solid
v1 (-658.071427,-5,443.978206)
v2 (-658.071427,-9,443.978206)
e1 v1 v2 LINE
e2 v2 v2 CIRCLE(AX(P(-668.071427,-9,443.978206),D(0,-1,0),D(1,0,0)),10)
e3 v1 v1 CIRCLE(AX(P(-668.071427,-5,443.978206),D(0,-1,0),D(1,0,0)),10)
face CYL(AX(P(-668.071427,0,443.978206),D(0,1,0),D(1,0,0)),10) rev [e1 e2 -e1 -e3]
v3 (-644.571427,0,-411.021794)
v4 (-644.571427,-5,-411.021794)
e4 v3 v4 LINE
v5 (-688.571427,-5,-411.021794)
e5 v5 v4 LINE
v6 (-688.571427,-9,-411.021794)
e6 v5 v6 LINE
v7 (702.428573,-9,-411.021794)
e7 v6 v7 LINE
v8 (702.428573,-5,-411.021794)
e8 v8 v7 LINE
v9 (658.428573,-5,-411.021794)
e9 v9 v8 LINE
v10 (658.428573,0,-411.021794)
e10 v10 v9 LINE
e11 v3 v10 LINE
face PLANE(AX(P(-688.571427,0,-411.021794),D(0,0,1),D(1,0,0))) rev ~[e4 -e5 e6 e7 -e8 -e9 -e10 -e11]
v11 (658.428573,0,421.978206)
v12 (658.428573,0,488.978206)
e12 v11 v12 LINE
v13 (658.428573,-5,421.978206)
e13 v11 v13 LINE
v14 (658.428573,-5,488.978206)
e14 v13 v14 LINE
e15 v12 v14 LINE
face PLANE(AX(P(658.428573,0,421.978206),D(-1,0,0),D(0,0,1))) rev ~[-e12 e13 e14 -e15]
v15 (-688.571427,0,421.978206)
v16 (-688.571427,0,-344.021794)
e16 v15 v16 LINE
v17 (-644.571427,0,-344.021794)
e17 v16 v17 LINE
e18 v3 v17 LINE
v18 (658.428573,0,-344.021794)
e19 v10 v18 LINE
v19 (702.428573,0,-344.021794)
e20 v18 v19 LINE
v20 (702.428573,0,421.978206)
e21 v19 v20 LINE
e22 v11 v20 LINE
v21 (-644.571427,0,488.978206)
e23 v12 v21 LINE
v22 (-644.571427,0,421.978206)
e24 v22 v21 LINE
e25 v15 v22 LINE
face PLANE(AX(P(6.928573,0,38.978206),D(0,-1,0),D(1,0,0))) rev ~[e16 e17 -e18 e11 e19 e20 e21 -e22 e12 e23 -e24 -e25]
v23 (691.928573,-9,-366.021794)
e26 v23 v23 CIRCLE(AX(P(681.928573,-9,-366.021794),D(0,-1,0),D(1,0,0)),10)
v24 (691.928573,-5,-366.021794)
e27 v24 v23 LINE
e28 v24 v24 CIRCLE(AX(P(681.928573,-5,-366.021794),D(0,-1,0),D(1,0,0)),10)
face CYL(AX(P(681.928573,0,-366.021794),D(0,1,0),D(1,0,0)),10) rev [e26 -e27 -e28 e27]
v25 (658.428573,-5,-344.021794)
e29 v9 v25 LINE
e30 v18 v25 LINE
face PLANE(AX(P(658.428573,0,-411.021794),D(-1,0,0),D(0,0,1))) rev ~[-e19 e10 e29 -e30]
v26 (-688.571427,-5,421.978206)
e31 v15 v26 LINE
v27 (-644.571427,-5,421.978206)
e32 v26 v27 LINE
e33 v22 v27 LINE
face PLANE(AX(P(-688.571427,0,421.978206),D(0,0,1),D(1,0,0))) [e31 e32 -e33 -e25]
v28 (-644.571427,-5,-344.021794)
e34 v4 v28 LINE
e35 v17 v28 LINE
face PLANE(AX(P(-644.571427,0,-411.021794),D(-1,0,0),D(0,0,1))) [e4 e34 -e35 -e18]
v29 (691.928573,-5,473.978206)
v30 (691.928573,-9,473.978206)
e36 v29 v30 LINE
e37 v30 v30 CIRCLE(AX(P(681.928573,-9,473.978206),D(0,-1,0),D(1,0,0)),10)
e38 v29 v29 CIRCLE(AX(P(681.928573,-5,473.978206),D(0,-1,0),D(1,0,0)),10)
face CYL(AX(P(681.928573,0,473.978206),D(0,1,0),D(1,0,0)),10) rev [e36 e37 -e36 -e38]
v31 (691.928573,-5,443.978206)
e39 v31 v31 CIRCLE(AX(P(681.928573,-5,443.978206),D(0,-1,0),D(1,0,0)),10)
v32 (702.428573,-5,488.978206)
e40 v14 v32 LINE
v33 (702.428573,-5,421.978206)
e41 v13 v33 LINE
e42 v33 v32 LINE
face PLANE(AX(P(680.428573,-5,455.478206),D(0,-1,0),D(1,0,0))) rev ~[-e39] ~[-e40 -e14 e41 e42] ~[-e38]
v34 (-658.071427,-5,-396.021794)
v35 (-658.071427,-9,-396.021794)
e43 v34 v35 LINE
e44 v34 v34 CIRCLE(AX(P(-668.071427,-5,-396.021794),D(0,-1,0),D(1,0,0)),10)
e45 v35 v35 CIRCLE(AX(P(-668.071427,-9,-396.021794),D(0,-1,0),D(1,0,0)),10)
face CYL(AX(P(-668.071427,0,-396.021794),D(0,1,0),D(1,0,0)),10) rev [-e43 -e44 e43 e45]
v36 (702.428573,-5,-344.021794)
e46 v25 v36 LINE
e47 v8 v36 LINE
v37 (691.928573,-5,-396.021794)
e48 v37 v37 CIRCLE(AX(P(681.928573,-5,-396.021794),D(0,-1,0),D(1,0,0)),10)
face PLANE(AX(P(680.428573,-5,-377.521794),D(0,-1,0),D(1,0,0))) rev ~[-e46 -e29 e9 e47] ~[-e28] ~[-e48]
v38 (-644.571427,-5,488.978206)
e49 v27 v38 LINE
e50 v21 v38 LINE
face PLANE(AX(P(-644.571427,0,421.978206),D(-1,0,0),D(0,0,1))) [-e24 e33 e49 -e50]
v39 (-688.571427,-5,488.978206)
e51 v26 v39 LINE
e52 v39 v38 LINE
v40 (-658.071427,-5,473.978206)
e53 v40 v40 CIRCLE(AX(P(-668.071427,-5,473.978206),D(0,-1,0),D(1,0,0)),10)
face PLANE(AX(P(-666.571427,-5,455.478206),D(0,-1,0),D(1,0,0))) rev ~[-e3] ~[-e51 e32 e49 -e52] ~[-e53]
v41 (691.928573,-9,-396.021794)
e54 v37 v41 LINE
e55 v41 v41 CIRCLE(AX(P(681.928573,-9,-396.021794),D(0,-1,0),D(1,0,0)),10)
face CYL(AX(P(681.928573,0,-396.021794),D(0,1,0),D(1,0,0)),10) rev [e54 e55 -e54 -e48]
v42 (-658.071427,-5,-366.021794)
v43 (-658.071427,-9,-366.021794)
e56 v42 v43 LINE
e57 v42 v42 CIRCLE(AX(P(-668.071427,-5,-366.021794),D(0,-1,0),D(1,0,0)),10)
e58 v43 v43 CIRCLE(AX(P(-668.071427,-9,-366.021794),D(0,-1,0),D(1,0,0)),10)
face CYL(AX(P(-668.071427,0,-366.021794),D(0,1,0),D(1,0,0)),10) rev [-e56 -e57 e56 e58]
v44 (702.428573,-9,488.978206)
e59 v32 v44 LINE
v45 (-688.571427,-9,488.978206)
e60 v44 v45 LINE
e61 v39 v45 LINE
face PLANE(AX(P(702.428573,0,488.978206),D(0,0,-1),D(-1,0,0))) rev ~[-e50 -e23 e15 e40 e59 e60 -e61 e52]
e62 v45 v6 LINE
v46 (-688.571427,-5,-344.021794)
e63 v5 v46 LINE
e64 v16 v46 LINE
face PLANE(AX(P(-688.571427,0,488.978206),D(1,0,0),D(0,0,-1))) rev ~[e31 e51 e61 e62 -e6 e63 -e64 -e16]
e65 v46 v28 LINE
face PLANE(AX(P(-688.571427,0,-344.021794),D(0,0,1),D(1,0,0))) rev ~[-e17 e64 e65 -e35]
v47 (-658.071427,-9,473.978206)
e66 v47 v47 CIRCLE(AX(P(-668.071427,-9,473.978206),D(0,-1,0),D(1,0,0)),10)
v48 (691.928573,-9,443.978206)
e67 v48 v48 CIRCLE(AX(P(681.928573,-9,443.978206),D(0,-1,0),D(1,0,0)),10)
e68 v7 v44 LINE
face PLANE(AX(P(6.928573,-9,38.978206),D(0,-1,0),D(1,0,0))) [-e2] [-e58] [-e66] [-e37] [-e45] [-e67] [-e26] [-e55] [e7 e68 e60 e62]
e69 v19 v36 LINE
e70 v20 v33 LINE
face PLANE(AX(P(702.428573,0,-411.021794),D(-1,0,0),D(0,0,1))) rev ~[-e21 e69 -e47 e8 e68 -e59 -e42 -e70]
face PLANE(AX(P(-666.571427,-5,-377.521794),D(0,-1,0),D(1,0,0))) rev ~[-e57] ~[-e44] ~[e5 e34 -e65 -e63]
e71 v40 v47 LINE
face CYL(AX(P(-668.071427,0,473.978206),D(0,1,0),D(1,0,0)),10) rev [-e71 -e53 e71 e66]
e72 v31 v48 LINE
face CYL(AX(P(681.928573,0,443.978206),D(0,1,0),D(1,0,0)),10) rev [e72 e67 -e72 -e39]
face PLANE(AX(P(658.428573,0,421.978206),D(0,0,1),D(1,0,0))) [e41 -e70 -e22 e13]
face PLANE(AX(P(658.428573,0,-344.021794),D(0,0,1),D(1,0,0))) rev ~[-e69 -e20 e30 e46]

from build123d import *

# Parameters (mm, degrees)
F0_W     = 44
F0_H     = 67
F0_R     = 10
F1_DEPTH = 9
F2_DEPTH = 5


# Not quite as in the source:
# - a feature names something its author has since deleted; it is built from what else it names


with BuildPart() as f1:
    # F0 (on Front) → F1 (new body)
    with BuildSketch(Plane.XZ):
        Polygon((658.4285732806, 488.9782061457), (-644.5714267194, 488.9782061457), (-644.5714267194, 421.9782061457), (-688.5714267194, 421.9782061457), (-688.5714267194, -344.0217938543), (-644.5714267194, -344.0217938543), (-644.5714267194, -411.0217938543), (658.4285732806, -411.0217938543), (658.4285732806, -344.0217938543), (702.4285732806, -344.0217938543), (702.4285732806, 421.9782061457), (658.4285732806, 421.9782061457), align=None)
        with Locations((680.4285732806, -377.5217938543)):
            Rectangle(F0_W, F0_H)
        with Locations((681.9285732806, -396.0217938543)):
            Circle(F0_R, mode=Mode.SUBTRACT)
        with Locations((681.9285732806, -366.0217938543)):
            Circle(F0_R, mode=Mode.SUBTRACT)
        with Locations((-666.5714267194, 455.4782061457)):
            Rectangle(F0_W, F0_H)
        with Locations((-668.0714267194, 443.9782061457)):
            Circle(F0_R, mode=Mode.SUBTRACT)
        with Locations((-668.0714267194, 473.9782061457)):
            Circle(F0_R, mode=Mode.SUBTRACT)
        with Locations((680.4285732806, 455.4782061457)):
            Rectangle(F0_W, F0_H)
        with Locations((681.9285732806, 443.9782061457)):
            Circle(F0_R, mode=Mode.SUBTRACT)
        with Locations((681.9285732806, 473.9782061457)):
            Circle(F0_R, mode=Mode.SUBTRACT)
        with Locations((-666.5714267194, -377.5217938543)):
            Rectangle(F0_W, F0_H)
        with Locations((-668.0714267194, -396.0217938543)):
            Circle(F0_R, mode=Mode.SUBTRACT)
        with Locations((-668.0714267194, -366.0217938543)):
            Circle(F0_R, mode=Mode.SUBTRACT)
    extrude(amount=F1_DEPTH)

    # F0 (on Front) → F2 (cut)
    with BuildSketch(Plane.XZ):
        with Locations((680.4285732806, -377.5217938543)):
            Rectangle(F0_W, F0_H)
        with Locations((681.9285732806, -396.0217938543)):
            Circle(F0_R, mode=Mode.SUBTRACT)
        with Locations((681.9285732806, -366.0217938543)):
            Circle(F0_R, mode=Mode.SUBTRACT)
        with Locations((-666.5714267194, 455.4782061457)):
            Rectangle(F0_W, F0_H)
        with Locations((-668.0714267194, 443.9782061457)):
            Circle(F0_R, mode=Mode.SUBTRACT)
        with Locations((-668.0714267194, 473.9782061457)):
            Circle(F0_R, mode=Mode.SUBTRACT)
        with Locations((680.4285732806, 455.4782061457)):
            Rectangle(F0_W, F0_H)
        with Locations((681.9285732806, 443.9782061457)):
            Circle(F0_R, mode=Mode.SUBTRACT)
        with Locations((681.9285732806, 473.9782061457)):
            Circle(F0_R, mode=Mode.SUBTRACT)
        with Locations((-666.5714267194, -377.5217938543)):
            Rectangle(F0_W, F0_H)
        with Locations((-668.0714267194, -396.0217938543)):
            Circle(F0_R, mode=Mode.SUBTRACT)
        with Locations((-668.0714267194, -366.0217938543)):
            Circle(F0_R, mode=Mode.SUBTRACT)
    extrude(amount=F2_DEPTH, mode=Mode.SUBTRACT)


solid = f1.part
